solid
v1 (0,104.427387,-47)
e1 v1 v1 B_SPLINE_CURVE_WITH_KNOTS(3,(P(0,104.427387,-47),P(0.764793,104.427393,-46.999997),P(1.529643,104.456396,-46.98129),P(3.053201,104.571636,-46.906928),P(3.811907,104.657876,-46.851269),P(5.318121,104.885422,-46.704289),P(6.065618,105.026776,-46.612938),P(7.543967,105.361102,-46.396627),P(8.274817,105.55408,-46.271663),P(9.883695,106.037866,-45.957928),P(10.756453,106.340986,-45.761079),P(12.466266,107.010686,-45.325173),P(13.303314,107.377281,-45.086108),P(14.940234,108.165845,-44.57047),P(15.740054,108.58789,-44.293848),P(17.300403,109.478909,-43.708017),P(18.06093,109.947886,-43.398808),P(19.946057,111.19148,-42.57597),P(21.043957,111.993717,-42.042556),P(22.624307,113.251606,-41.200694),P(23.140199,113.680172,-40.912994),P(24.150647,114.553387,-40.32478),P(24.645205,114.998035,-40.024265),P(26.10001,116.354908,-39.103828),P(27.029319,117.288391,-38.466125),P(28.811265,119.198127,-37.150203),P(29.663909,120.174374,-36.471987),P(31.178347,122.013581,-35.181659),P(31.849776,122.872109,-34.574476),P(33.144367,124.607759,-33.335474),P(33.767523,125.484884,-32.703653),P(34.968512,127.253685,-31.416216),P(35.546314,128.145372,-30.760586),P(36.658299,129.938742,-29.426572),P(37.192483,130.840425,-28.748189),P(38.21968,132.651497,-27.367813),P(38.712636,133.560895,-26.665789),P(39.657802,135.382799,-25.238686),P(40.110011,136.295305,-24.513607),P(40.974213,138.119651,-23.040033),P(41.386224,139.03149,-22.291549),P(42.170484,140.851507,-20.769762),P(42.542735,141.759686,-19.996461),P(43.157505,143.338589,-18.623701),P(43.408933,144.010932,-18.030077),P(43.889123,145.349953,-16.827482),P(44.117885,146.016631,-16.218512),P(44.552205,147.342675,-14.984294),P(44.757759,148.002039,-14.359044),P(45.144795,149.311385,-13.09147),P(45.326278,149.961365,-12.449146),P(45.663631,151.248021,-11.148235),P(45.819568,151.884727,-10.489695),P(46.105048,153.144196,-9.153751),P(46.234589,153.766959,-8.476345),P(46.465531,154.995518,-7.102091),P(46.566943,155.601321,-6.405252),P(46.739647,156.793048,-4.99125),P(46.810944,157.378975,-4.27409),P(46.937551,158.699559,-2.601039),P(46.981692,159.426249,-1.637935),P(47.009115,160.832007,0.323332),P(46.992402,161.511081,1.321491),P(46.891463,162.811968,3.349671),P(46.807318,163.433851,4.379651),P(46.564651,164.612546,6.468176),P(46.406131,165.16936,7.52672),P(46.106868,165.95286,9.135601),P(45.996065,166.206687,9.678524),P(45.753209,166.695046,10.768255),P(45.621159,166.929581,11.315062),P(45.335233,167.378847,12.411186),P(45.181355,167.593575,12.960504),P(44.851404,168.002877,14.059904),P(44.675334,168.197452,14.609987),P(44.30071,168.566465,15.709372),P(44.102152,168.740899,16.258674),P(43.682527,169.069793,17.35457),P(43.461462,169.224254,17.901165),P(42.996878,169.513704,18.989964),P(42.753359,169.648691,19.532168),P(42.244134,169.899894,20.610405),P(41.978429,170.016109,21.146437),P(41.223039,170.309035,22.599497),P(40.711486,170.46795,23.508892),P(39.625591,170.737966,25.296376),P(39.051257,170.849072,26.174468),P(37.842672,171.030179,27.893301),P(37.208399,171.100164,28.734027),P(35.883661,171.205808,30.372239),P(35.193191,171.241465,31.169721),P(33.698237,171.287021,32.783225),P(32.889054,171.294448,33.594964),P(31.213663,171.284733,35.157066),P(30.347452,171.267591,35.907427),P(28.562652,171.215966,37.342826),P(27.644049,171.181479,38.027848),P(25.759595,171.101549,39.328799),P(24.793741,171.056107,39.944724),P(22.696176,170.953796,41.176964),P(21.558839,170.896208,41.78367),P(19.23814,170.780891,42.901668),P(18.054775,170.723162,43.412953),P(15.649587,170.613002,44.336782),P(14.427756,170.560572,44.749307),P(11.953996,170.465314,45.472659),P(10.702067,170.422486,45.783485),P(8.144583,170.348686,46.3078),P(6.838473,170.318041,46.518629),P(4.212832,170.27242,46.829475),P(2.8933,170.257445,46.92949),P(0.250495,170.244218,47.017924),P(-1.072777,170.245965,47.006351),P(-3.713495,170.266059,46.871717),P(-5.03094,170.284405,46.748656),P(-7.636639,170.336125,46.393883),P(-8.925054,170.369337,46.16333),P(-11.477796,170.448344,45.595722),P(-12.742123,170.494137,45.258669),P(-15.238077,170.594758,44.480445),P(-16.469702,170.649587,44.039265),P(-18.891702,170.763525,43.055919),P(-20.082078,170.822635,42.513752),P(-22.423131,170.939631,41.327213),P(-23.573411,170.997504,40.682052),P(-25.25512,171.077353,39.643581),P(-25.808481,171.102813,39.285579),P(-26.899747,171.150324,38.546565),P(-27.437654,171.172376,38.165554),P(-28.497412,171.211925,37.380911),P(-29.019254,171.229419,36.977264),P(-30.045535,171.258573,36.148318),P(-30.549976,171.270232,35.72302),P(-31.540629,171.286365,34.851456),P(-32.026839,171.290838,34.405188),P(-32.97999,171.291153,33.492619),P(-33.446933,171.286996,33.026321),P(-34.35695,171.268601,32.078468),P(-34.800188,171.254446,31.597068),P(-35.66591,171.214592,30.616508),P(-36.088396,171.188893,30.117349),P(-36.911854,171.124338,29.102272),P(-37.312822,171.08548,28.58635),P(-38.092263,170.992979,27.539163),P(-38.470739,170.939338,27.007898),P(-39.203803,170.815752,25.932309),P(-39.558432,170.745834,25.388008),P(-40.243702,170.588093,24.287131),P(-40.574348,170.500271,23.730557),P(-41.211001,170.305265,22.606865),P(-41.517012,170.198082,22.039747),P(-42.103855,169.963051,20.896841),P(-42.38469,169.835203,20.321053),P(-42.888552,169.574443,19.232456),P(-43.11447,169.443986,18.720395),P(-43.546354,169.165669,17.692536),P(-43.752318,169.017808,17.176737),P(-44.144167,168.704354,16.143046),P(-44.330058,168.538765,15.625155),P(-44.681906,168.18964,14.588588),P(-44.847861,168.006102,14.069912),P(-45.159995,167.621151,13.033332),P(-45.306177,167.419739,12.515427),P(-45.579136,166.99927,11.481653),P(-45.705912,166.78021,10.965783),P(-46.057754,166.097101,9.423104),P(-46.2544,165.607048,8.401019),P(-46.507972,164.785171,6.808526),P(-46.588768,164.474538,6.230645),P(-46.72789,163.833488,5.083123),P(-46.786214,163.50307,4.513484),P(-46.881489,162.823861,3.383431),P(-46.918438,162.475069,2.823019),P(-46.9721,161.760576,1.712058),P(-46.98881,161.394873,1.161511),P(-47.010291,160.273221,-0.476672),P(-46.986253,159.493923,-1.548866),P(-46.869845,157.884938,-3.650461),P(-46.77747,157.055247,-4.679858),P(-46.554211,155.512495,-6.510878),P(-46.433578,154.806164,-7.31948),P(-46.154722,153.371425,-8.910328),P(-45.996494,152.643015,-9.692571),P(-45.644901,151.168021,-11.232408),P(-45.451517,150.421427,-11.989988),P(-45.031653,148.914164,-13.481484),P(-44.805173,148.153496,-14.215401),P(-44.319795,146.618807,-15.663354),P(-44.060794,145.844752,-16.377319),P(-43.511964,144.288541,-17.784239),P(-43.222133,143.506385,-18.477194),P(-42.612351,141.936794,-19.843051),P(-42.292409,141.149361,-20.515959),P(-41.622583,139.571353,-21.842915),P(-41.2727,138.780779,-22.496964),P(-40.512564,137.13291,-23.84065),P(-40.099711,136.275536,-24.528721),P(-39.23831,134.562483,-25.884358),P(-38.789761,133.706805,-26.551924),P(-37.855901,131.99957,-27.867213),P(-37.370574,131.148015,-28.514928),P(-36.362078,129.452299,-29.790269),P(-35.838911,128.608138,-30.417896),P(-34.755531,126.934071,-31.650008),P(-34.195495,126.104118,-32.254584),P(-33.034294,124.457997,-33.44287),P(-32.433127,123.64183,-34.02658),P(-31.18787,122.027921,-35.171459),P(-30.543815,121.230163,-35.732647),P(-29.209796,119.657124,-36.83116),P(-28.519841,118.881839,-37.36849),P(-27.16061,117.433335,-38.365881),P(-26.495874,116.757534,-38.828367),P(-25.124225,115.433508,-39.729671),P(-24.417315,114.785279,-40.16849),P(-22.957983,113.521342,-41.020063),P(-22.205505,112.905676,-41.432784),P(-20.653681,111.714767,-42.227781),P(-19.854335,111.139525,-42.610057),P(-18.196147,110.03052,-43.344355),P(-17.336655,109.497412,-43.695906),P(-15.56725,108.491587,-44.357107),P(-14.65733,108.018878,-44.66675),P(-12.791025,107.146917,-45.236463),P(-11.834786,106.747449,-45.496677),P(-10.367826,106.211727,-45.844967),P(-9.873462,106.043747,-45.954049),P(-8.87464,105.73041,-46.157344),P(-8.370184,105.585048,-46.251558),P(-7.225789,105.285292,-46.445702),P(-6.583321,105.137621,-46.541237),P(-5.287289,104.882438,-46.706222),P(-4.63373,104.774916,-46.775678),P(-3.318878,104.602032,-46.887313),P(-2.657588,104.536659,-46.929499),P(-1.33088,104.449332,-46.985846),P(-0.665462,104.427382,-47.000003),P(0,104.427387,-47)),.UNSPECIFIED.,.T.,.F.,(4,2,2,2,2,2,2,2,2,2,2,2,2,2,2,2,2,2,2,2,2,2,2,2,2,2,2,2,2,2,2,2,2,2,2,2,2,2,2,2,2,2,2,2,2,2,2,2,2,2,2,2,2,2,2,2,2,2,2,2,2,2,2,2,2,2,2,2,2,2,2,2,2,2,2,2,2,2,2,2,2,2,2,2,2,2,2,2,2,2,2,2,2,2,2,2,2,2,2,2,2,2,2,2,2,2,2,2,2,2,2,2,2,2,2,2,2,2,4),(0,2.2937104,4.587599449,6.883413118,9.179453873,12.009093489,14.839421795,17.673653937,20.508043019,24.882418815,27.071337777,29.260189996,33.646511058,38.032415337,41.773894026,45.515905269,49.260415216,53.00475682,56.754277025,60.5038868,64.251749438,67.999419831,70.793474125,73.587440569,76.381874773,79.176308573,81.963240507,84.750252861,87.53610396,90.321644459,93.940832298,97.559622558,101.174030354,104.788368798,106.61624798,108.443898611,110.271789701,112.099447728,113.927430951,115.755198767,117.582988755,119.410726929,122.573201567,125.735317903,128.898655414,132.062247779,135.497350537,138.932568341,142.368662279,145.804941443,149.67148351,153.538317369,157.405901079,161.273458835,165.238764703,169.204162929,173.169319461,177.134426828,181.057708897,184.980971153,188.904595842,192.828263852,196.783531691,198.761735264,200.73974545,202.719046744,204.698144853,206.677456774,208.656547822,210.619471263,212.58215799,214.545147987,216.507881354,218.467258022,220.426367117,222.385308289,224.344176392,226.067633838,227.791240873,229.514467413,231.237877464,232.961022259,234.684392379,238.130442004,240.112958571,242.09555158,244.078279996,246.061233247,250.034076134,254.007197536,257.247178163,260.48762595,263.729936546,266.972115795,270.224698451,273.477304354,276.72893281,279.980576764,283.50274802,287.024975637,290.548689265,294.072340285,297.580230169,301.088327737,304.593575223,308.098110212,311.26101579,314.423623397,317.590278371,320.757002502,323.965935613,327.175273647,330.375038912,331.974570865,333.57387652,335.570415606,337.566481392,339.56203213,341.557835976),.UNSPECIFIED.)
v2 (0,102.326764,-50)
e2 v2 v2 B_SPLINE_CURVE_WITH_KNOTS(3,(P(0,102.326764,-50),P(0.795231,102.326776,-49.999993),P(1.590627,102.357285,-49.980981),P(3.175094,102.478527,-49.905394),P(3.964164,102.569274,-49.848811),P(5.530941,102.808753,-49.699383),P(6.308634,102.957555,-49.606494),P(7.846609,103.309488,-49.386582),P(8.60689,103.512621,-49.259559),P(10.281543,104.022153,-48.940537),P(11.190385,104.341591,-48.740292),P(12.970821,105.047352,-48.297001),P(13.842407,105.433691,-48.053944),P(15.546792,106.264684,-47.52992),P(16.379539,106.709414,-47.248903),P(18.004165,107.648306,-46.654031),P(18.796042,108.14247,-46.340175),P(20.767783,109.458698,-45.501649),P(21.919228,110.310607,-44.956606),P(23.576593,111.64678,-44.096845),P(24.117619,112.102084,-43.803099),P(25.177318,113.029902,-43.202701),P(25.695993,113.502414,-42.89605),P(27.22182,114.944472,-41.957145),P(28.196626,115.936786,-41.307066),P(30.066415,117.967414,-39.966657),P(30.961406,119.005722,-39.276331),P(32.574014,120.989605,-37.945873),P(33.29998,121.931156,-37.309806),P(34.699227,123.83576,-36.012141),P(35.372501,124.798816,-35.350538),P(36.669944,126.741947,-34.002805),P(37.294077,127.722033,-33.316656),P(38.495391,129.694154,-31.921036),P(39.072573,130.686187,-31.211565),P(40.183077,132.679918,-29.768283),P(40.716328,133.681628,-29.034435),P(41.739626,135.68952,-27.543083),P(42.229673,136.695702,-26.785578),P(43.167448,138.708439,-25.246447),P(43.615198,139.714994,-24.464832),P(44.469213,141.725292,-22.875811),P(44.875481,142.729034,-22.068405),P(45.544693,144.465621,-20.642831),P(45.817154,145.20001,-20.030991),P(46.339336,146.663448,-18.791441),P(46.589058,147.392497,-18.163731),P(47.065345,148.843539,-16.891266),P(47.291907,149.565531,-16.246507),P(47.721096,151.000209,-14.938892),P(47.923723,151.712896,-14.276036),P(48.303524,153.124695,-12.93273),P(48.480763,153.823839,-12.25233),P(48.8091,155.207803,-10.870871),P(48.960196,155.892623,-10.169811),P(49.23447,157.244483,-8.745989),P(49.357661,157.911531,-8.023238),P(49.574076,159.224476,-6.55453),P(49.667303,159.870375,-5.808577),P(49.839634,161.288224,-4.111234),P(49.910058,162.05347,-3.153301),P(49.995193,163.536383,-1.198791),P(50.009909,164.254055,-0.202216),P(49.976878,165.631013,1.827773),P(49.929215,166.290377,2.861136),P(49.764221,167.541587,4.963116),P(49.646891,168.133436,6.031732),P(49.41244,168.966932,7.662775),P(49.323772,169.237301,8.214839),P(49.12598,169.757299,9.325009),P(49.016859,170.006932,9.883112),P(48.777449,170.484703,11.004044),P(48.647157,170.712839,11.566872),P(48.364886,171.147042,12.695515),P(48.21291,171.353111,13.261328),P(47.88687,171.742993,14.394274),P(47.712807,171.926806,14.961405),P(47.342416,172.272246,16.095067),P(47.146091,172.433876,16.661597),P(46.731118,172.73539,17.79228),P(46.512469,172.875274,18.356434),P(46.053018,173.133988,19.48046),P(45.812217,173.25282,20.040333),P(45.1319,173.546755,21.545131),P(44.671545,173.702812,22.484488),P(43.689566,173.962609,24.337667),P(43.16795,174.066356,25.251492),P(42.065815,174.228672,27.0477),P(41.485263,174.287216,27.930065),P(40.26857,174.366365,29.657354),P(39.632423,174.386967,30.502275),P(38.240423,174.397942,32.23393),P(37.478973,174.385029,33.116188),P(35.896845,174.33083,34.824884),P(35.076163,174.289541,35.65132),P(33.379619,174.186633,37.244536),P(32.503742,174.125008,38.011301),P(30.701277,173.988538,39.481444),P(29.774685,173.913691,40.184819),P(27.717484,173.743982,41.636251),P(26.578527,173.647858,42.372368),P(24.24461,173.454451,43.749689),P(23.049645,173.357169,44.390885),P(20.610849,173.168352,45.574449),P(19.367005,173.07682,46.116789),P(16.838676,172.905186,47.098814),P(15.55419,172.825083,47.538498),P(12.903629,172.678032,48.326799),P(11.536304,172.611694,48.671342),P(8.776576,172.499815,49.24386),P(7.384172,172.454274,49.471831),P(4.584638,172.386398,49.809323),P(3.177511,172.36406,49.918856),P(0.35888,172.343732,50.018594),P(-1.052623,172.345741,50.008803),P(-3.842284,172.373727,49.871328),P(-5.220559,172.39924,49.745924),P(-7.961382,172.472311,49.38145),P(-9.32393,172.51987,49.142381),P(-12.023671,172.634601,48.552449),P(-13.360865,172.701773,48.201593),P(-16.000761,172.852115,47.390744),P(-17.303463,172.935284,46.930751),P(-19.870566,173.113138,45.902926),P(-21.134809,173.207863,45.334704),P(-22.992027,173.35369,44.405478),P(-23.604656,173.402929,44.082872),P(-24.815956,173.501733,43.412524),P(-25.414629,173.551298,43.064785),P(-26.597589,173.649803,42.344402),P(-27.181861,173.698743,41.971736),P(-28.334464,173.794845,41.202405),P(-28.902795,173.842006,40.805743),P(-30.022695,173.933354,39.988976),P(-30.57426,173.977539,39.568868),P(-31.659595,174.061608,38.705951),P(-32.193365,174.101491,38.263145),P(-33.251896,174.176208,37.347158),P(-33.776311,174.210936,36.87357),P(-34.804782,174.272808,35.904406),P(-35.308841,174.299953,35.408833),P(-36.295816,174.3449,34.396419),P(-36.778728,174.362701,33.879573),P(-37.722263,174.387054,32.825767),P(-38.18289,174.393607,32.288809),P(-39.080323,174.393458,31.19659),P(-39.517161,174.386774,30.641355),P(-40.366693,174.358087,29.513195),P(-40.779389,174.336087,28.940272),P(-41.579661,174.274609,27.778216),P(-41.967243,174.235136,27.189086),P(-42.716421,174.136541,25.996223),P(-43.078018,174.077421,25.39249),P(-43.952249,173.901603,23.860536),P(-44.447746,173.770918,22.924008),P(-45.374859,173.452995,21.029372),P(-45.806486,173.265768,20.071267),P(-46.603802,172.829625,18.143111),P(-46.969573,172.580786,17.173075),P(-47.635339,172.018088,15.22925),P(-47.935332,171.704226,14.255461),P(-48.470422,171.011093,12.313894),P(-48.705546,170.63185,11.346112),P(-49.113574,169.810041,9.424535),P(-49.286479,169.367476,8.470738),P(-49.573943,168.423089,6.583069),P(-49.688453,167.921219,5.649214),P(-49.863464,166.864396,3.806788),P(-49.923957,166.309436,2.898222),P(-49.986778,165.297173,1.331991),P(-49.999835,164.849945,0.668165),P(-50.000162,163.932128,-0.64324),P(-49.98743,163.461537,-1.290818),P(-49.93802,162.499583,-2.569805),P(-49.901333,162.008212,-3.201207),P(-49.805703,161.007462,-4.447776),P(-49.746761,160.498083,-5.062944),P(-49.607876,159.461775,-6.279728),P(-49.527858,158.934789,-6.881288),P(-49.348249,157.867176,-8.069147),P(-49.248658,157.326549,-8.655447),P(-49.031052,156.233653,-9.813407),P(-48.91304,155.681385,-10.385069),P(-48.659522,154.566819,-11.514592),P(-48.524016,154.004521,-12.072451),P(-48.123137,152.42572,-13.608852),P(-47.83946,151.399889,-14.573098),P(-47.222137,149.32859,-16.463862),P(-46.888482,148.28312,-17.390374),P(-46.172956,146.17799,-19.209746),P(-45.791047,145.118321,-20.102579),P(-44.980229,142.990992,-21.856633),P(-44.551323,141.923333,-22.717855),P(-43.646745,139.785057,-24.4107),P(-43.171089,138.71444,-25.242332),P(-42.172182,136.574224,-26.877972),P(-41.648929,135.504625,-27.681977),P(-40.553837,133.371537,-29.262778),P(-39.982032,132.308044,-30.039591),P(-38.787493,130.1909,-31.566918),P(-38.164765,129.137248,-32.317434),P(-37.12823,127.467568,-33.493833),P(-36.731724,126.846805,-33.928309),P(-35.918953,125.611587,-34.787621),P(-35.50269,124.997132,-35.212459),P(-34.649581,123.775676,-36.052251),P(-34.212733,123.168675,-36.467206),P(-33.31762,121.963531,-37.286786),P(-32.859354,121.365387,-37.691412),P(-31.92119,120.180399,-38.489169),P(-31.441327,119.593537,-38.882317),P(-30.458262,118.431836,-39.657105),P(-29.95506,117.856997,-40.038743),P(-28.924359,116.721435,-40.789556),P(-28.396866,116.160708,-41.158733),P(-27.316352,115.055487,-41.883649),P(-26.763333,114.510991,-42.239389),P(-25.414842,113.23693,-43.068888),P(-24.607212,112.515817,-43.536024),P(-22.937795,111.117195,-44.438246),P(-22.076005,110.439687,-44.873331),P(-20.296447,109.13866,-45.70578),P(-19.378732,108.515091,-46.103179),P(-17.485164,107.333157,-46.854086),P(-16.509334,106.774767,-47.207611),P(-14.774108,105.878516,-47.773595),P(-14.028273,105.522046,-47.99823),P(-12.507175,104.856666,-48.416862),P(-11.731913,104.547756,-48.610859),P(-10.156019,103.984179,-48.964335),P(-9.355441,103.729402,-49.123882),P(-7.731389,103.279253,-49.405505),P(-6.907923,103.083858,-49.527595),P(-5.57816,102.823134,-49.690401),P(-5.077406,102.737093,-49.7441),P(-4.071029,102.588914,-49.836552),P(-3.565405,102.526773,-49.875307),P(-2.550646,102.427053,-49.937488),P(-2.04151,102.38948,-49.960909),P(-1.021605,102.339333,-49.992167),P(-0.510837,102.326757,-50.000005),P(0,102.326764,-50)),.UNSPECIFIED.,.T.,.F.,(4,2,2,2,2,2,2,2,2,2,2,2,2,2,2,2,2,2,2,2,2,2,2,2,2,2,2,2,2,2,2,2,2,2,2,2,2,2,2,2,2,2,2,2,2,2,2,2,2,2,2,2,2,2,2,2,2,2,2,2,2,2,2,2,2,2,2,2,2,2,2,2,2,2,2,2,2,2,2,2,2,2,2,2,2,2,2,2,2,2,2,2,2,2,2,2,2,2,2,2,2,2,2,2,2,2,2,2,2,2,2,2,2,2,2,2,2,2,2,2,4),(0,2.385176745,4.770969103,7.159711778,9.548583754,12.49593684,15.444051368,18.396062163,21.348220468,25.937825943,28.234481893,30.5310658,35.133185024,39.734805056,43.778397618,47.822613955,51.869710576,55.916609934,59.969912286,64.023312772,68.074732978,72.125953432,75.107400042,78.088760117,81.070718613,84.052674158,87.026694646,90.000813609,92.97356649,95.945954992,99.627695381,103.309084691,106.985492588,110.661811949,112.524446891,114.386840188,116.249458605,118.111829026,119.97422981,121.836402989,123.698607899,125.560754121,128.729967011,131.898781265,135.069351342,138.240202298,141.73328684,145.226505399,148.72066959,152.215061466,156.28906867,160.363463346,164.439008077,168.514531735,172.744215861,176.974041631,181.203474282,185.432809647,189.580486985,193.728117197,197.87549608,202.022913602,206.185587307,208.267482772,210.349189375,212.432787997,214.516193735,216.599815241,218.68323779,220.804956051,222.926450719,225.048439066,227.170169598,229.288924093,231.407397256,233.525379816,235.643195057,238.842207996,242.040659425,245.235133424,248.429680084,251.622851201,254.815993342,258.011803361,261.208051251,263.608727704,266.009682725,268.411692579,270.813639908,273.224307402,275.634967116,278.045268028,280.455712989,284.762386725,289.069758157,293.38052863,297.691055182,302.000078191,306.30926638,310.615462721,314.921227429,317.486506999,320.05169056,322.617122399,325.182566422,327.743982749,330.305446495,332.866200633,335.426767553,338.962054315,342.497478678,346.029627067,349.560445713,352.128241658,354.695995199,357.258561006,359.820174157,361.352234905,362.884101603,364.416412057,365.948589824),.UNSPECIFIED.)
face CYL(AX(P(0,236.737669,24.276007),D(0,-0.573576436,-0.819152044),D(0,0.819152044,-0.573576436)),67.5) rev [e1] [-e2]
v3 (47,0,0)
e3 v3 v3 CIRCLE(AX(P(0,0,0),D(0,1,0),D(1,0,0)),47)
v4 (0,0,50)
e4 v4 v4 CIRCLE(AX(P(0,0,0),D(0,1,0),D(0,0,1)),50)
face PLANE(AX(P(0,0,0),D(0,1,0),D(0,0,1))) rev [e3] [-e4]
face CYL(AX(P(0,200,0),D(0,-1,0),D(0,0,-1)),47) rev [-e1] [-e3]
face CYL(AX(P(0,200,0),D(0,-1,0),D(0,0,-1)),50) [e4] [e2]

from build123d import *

# Parameters (mm, degrees)
EXTRUDE_1_OUTLINE_R      = 50
EXTRUDE_1_OUTLINE_R_2    = 47
EXTRUDE_1_DEPTH          = 200
CUT_EXTRUDE_1_DEPTH      = 213.132034356
CUT_EXTRUDE_1_DEPTH_BACK = 213.132034356
SKETCH_2_R               = 67.5


# Read off the part's stored shape, not the designer's step: Вытянуть-Тонкостенный1
with BuildPart() as part:
    # Вытянуть-Тонкостенный1 outline → Вытянуть-Тонкостенный1 (new body)
    with BuildSketch(Plane(origin=(0, 0, 0), x_dir=(1, 0, 0), z_dir=(0, 1, 0))):
        Circle(EXTRUDE_1_OUTLINE_R)
        Circle(EXTRUDE_1_OUTLINE_R_2, mode=Mode.SUBTRACT)
    extrude(amount=EXTRUDE_1_DEPTH)

    # Эскиз2 → Вырез-Вытянуть1 (cut, two sides: drawn at the far end of the back side and taken through both)
    with BuildSketch(Plane(origin=(0, 0, 0), x_dir=(1, 0, 0), z_dir=(0, -0.5735764363510444, -0.819152044288993)).offset(-CUT_EXTRUDE_1_DEPTH_BACK)):
        with Locations((0, -180)):
            Circle(SKETCH_2_R)
    extrude(amount=CUT_EXTRUDE_1_DEPTH + CUT_EXTRUDE_1_DEPTH_BACK, mode=Mode.SUBTRACT)


solid = part.part
